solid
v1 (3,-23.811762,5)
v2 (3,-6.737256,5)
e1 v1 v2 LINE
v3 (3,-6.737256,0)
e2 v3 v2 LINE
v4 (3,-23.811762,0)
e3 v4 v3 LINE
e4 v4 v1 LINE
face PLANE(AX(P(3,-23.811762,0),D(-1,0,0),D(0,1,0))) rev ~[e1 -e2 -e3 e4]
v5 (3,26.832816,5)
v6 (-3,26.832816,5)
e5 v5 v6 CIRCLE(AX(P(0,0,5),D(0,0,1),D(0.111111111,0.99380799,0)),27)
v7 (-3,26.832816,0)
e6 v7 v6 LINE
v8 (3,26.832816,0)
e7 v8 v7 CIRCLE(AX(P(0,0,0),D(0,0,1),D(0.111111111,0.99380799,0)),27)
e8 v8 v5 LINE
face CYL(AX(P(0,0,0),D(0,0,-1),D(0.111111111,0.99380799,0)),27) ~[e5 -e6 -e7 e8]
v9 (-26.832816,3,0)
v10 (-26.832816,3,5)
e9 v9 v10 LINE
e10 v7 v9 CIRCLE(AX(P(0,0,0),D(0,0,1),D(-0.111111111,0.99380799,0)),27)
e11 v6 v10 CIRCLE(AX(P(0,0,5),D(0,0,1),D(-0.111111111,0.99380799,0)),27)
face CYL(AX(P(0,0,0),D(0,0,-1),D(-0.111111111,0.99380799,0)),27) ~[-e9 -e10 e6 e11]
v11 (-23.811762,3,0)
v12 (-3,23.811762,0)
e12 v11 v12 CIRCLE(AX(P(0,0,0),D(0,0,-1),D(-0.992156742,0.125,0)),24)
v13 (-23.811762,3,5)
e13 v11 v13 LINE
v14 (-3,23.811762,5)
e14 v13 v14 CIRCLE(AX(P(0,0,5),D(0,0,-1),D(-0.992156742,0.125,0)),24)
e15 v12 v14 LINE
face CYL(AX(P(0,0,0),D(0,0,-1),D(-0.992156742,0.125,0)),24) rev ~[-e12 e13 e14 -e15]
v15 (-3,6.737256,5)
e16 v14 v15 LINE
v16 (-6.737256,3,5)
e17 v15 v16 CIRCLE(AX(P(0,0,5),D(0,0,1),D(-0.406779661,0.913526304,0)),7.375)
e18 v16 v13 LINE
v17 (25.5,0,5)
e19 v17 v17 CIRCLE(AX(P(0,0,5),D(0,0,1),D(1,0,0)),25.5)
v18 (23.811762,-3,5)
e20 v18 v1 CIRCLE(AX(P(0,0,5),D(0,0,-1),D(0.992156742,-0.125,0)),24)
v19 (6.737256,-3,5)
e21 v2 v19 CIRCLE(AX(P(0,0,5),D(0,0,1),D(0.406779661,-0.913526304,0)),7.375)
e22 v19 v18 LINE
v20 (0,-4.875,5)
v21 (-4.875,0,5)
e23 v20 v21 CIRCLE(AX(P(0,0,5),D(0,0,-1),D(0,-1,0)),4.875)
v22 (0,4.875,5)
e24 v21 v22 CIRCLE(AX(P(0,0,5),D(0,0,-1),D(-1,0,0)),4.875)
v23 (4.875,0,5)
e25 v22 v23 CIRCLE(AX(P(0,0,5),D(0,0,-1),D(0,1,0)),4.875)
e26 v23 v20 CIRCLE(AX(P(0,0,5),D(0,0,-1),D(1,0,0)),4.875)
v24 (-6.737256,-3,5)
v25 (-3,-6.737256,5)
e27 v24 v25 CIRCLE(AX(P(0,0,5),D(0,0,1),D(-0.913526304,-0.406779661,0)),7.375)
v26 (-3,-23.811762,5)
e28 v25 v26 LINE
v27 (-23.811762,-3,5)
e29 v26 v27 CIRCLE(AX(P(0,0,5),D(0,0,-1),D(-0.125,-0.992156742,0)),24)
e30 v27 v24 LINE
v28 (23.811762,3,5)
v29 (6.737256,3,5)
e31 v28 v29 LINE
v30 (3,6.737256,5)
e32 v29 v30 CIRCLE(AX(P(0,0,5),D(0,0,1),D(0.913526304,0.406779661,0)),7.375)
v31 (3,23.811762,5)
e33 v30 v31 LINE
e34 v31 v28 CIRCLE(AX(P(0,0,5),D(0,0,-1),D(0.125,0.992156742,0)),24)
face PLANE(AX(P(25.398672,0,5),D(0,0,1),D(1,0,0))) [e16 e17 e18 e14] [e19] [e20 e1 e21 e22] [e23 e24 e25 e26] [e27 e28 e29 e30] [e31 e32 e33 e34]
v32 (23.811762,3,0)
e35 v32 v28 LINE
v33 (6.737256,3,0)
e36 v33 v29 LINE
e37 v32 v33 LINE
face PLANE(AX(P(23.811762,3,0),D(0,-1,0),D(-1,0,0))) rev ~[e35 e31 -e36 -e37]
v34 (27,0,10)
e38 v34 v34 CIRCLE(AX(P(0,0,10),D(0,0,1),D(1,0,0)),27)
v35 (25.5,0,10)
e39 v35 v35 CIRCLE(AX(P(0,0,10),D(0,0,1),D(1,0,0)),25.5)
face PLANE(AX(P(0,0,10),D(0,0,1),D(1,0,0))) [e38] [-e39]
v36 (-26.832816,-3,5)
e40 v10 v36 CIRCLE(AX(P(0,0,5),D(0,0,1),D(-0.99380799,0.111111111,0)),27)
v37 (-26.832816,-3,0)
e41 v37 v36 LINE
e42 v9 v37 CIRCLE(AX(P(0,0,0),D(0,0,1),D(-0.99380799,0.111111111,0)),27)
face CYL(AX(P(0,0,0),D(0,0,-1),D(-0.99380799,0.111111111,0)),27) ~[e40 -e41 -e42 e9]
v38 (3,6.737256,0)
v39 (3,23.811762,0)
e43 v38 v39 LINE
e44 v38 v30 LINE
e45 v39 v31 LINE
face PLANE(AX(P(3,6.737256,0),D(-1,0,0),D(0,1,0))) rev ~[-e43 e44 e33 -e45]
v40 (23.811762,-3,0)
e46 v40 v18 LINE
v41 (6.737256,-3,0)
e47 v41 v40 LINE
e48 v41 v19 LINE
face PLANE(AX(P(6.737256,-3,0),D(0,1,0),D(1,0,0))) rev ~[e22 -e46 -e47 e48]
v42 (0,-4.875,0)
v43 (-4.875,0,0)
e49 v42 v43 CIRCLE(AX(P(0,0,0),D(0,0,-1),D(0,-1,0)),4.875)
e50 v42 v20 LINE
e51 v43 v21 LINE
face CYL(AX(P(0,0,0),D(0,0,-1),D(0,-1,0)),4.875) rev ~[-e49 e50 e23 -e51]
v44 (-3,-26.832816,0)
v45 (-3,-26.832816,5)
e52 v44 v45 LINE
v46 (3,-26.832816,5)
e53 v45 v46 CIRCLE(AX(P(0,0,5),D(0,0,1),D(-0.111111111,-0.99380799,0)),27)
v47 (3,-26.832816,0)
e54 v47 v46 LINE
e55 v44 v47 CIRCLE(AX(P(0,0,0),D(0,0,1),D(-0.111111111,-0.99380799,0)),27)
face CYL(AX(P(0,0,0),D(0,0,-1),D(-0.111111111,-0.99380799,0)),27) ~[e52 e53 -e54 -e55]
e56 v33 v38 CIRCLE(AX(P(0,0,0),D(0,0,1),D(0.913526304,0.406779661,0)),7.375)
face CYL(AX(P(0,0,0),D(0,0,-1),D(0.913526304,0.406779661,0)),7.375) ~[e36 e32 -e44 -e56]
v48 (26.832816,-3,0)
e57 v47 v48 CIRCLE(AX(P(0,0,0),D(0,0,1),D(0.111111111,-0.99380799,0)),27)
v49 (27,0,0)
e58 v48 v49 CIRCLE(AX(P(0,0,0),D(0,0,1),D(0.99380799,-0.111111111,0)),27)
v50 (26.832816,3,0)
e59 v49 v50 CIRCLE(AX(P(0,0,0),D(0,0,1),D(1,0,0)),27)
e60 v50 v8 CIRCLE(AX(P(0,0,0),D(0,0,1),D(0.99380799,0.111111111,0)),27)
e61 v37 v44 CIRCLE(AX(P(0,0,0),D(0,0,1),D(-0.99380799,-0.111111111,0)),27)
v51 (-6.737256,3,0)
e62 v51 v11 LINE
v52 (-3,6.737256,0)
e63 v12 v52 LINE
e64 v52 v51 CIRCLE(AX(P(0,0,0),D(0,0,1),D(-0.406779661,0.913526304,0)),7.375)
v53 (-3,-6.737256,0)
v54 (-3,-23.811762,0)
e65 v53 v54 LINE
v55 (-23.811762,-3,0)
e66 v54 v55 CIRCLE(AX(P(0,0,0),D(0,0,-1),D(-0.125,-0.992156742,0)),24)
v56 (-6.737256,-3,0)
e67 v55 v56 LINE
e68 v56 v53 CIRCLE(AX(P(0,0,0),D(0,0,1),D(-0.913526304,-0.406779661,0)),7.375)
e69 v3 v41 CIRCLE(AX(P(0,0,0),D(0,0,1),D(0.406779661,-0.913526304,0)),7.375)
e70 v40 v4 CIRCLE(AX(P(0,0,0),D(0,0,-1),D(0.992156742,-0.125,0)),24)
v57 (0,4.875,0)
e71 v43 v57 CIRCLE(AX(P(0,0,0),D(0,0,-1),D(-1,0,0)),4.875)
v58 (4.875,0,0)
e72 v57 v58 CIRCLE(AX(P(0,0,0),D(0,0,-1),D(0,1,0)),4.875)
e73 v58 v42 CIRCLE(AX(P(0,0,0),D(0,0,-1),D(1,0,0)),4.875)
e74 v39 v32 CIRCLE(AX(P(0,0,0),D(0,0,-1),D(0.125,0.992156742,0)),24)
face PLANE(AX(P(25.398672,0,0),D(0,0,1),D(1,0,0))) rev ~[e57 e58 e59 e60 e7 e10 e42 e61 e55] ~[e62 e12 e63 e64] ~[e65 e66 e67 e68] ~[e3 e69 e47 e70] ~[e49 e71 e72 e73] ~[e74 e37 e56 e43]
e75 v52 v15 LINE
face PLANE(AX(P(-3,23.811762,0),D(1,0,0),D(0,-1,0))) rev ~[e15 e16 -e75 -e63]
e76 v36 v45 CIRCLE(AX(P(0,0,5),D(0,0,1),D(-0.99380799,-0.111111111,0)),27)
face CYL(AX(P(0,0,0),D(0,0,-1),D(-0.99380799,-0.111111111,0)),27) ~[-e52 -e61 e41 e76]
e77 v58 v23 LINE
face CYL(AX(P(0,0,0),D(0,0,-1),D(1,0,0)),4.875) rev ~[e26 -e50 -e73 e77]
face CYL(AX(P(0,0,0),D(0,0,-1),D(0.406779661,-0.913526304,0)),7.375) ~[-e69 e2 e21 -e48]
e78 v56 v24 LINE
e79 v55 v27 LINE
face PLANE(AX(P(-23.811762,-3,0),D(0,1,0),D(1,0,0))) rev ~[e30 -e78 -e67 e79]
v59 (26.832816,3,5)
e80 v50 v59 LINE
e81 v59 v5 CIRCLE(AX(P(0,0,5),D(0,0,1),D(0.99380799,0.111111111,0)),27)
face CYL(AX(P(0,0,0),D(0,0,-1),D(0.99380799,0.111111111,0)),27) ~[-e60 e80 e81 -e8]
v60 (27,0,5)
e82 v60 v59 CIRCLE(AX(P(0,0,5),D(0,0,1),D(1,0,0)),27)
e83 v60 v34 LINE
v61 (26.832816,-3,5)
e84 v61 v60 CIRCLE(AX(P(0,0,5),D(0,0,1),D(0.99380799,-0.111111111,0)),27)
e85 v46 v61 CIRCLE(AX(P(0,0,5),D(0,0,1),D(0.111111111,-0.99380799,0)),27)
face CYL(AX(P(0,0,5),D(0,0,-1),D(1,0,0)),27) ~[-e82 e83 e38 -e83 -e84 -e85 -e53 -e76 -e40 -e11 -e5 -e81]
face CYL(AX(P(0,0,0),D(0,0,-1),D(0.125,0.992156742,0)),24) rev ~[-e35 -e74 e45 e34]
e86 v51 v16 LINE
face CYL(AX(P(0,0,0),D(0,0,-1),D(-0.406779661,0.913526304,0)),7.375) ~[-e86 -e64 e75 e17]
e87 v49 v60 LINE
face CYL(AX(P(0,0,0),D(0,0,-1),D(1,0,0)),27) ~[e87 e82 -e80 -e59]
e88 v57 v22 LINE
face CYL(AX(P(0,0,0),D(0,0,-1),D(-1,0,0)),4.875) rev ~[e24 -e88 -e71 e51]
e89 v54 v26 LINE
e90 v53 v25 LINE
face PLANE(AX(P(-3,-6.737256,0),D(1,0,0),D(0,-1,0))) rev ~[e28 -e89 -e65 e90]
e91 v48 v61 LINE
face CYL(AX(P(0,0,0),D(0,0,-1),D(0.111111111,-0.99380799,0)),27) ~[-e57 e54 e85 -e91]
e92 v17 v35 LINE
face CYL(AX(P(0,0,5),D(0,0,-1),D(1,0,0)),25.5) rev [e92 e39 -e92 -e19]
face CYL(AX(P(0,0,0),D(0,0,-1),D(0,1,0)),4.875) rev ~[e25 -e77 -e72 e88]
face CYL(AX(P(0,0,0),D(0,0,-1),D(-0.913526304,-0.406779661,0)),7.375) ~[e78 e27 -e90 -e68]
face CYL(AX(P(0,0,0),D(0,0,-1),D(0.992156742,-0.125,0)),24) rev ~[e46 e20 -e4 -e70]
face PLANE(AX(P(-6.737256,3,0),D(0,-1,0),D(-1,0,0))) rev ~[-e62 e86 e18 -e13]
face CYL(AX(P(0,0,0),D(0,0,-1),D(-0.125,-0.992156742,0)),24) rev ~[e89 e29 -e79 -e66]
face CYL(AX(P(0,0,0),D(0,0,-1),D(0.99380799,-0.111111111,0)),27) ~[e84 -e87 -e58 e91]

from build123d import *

# Parameters (mm, degrees)
F1_DEPTH = 5
F2_R     = 27
F2_R_2   = 25.5
F3_DEPTH = 5


# Not quite as in the source:
# - a feature names something its author has since deleted; it is built from what else it names


with BuildPart() as f1:
    # F0 (on Top) → F1 (new body)
    with BuildSketch(Plane.XY):
        with BuildLine():
            Line((26.83281573, 3), (23.8117617996, 3))
            ThreePointArc((23.8117617996, 3), (23.9528942217, 1.502949901), (24, 0))
            ThreePointArc((24, 0), (23.9528942217, -1.502949901), (23.8117617996, -3))
            Line((23.8117617996, -3), (26.83281573, -3))
            ThreePointArc((26.83281573, -3), (26.9581715321, -1.5023274094), (27, 0))
            ThreePointArc((27, 0), (26.9581715321, 1.5023274094), (26.83281573, 3))
        make_face()
        with BuildLine():
            ThreePointArc((3, 23.8117617996), (16.9705627485, 16.9705627485), (23.8117617996, 3))
            Line((23.8117617996, 3), (26.83281573, 3))
            ThreePointArc((26.83281573, 3), (19.091883092, 19.091883092), (3, 26.83281573))
            Line((3, 26.83281573), (3, 23.8117617996))
        make_face()
        with BuildLine():
            Line((26.83281573, -3), (23.8117617996, -3))
            ThreePointArc((23.8117617996, -3), (16.9705627485, -16.9705627485), (3, -23.8117617996))
            Line((3, -23.8117617996), (3, -26.83281573))
            ThreePointArc((3, -26.83281573), (19.091883092, -19.091883092), (26.83281573, -3))
        make_face()
        with BuildLine():
            ThreePointArc((-3, 23.8117617996), (0, 24), (3, 23.8117617996))
            Line((3, 23.8117617996), (3, 26.83281573))
            ThreePointArc((3, 26.83281573), (0, 27), (-3, 26.83281573))
            Line((-3, 26.83281573), (-3, 23.8117617996))
        make_face()
        with BuildLine():
            ThreePointArc((-23.8117617996, 3), (-16.9705627485, 16.9705627485), (-3, 23.8117617996))
            Line((-3, 23.8117617996), (-3, 26.83281573))
            ThreePointArc((-3, 26.83281573), (-19.091883092, 19.091883092), (-26.83281573, 3))
            Line((-26.83281573, 3), (-23.8117617996, 3))
        make_face()
        with BuildLine():
            Line((-3, -26.83281573), (-3, -23.8117617996))
            ThreePointArc((-3, -23.8117617996), (-16.9705627485, -16.9705627485), (-23.8117617996, -3))
            Line((-23.8117617996, -3), (-26.83281573, -3))
            ThreePointArc((-26.83281573, -3), (-19.091883092, -19.091883092), (-3, -26.83281573))
        make_face()
        with BuildLine():
            ThreePointArc((3, -23.8117617996), (0, -24), (-3, -23.8117617996))
            Line((-3, -23.8117617996), (-3, -26.83281573))
            ThreePointArc((-3, -26.83281573), (0, -27), (3, -26.83281573))
            Line((3, -26.83281573), (3, -23.8117617996))
        make_face()
        with BuildLine():
            ThreePointArc((-23.8117617996, -3), (-24, 0), (-23.8117617996, 3))
            Line((-23.8117617996, 3), (-26.83281573, 3))
            ThreePointArc((-26.83281573, 3), (-27, 0), (-26.83281573, -3))
            Line((-26.83281573, -3), (-23.8117617996, -3))
        make_face()
        with BuildLine():
            ThreePointArc((-6.7372564891, -3), (-7.2138024511, -1.5335185674), (-7.375, 0))
            ThreePointArc((-7.375, 0), (-7.2138024511, 1.5335185674), (-6.7372564891, 3))
            Line((-6.7372564891, 3), (-23.8117617996, 3))
            ThreePointArc((-23.8117617996, 3), (-24, 0), (-23.8117617996, -3))
            Line((-23.8117617996, -3), (-6.7372564891, -3))
        make_face()
        with BuildLine():
            ThreePointArc((-4.875, 0), (-3.4471455583, 3.4471455583), (0, 4.875))
            Line((0, 4.875), (0, 7.375))
            ThreePointArc((0, 7.375), (-1.5335185674, 7.2138024511), (-3, 6.7372564891))
            ThreePointArc((-3, 6.7372564891), (-5.2149125113, 5.2149125113), (-6.7372564891, 3))
            ThreePointArc((-6.7372564891, 3), (-7.2138024511, 1.5335185674), (-7.375, 0))
            Line((-7.375, 0), (-4.875, 0))
        make_face()
        with BuildLine():
            Line((0, -7.375), (0, -4.875))
            ThreePointArc((0, -4.875), (-3.4471455583, -3.4471455583), (-4.875, 0))
            Line((-4.875, 0), (-7.375, 0))
            ThreePointArc((-7.375, 0), (-7.2138024511, -1.5335185674), (-6.7372564891, -3))
            ThreePointArc((-6.7372564891, -3), (-5.2149125113, -5.2149125113), (-3, -6.7372564891))
            ThreePointArc((-3, -6.7372564891), (-1.5335185674, -7.2138024511), (0, -7.375))
        make_face()
        with BuildLine():
            Line((7.375, 0), (4.875, 0))
            ThreePointArc((4.875, 0), (3.4471455583, -3.4471455583), (0, -4.875))
            Line((0, -4.875), (0, -7.375))
            ThreePointArc((0, -7.375), (1.5335185674, -7.2138024511), (3, -6.7372564891))
            ThreePointArc((3, -6.7372564891), (5.2149125113, -5.2149125113), (6.7372564891, -3))
            ThreePointArc((6.7372564891, -3), (7.2138024511, -1.5335185674), (7.375, 0))
        make_face()
        with BuildLine():
            ThreePointArc((0, 4.875), (3.4471455583, 3.4471455583), (4.875, 0))
            Line((4.875, 0), (7.375, 0))
            ThreePointArc((7.375, 0), (7.2138024511, 1.5335185674), (6.7372564891, 3))
            ThreePointArc((6.7372564891, 3), (5.2149125113, 5.2149125113), (3, 6.7372564891))
            ThreePointArc((3, 6.7372564891), (1.5335185674, 7.2138024511), (0, 7.375))
            Line((0, 7.375), (0, 4.875))
        make_face()
        with BuildLine():
            ThreePointArc((-3, 6.7372564891), (-1.5335185674, 7.2138024511), (0, 7.375))
            ThreePointArc((0, 7.375), (1.5335185674, 7.2138024511), (3, 6.7372564891))
            Line((3, 6.7372564891), (3, 23.8117617996))
            ThreePointArc((3, 23.8117617996), (0, 24), (-3, 23.8117617996))
            Line((-3, 23.8117617996), (-3, 6.7372564891))
        make_face()
        with BuildLine():
            ThreePointArc((6.7372564891, 3), (7.2138024511, 1.5335185674), (7.375, 0))
            ThreePointArc((7.375, 0), (7.2138024511, -1.5335185674), (6.7372564891, -3))
            Line((6.7372564891, -3), (23.8117617996, -3))
            ThreePointArc((23.8117617996, -3), (23.9528942217, -1.502949901), (24, 0))
            ThreePointArc((24, 0), (23.9528942217, 1.502949901), (23.8117617996, 3))
            Line((23.8117617996, 3), (6.7372564891, 3))
        make_face()
        with BuildLine():
            ThreePointArc((3, -6.7372564891), (1.5335185674, -7.2138024511), (0, -7.375))
            ThreePointArc((0, -7.375), (-1.5335185674, -7.2138024511), (-3, -6.7372564891))
            Line((-3, -6.7372564891), (-3, -23.8117617996))
            ThreePointArc((-3, -23.8117617996), (0, -24), (3, -23.8117617996))
            Line((3, -23.8117617996), (3, -6.7372564891))
        make_face()
    extrude(amount=F1_DEPTH)

    # F2 (on face) → F3 (join)
    with BuildSketch(Plane.XY.offset(5)):
        Circle(F2_R)
        Circle(F2_R_2, mode=Mode.SUBTRACT)
    extrude(amount=F3_DEPTH)


solid = f1.part
